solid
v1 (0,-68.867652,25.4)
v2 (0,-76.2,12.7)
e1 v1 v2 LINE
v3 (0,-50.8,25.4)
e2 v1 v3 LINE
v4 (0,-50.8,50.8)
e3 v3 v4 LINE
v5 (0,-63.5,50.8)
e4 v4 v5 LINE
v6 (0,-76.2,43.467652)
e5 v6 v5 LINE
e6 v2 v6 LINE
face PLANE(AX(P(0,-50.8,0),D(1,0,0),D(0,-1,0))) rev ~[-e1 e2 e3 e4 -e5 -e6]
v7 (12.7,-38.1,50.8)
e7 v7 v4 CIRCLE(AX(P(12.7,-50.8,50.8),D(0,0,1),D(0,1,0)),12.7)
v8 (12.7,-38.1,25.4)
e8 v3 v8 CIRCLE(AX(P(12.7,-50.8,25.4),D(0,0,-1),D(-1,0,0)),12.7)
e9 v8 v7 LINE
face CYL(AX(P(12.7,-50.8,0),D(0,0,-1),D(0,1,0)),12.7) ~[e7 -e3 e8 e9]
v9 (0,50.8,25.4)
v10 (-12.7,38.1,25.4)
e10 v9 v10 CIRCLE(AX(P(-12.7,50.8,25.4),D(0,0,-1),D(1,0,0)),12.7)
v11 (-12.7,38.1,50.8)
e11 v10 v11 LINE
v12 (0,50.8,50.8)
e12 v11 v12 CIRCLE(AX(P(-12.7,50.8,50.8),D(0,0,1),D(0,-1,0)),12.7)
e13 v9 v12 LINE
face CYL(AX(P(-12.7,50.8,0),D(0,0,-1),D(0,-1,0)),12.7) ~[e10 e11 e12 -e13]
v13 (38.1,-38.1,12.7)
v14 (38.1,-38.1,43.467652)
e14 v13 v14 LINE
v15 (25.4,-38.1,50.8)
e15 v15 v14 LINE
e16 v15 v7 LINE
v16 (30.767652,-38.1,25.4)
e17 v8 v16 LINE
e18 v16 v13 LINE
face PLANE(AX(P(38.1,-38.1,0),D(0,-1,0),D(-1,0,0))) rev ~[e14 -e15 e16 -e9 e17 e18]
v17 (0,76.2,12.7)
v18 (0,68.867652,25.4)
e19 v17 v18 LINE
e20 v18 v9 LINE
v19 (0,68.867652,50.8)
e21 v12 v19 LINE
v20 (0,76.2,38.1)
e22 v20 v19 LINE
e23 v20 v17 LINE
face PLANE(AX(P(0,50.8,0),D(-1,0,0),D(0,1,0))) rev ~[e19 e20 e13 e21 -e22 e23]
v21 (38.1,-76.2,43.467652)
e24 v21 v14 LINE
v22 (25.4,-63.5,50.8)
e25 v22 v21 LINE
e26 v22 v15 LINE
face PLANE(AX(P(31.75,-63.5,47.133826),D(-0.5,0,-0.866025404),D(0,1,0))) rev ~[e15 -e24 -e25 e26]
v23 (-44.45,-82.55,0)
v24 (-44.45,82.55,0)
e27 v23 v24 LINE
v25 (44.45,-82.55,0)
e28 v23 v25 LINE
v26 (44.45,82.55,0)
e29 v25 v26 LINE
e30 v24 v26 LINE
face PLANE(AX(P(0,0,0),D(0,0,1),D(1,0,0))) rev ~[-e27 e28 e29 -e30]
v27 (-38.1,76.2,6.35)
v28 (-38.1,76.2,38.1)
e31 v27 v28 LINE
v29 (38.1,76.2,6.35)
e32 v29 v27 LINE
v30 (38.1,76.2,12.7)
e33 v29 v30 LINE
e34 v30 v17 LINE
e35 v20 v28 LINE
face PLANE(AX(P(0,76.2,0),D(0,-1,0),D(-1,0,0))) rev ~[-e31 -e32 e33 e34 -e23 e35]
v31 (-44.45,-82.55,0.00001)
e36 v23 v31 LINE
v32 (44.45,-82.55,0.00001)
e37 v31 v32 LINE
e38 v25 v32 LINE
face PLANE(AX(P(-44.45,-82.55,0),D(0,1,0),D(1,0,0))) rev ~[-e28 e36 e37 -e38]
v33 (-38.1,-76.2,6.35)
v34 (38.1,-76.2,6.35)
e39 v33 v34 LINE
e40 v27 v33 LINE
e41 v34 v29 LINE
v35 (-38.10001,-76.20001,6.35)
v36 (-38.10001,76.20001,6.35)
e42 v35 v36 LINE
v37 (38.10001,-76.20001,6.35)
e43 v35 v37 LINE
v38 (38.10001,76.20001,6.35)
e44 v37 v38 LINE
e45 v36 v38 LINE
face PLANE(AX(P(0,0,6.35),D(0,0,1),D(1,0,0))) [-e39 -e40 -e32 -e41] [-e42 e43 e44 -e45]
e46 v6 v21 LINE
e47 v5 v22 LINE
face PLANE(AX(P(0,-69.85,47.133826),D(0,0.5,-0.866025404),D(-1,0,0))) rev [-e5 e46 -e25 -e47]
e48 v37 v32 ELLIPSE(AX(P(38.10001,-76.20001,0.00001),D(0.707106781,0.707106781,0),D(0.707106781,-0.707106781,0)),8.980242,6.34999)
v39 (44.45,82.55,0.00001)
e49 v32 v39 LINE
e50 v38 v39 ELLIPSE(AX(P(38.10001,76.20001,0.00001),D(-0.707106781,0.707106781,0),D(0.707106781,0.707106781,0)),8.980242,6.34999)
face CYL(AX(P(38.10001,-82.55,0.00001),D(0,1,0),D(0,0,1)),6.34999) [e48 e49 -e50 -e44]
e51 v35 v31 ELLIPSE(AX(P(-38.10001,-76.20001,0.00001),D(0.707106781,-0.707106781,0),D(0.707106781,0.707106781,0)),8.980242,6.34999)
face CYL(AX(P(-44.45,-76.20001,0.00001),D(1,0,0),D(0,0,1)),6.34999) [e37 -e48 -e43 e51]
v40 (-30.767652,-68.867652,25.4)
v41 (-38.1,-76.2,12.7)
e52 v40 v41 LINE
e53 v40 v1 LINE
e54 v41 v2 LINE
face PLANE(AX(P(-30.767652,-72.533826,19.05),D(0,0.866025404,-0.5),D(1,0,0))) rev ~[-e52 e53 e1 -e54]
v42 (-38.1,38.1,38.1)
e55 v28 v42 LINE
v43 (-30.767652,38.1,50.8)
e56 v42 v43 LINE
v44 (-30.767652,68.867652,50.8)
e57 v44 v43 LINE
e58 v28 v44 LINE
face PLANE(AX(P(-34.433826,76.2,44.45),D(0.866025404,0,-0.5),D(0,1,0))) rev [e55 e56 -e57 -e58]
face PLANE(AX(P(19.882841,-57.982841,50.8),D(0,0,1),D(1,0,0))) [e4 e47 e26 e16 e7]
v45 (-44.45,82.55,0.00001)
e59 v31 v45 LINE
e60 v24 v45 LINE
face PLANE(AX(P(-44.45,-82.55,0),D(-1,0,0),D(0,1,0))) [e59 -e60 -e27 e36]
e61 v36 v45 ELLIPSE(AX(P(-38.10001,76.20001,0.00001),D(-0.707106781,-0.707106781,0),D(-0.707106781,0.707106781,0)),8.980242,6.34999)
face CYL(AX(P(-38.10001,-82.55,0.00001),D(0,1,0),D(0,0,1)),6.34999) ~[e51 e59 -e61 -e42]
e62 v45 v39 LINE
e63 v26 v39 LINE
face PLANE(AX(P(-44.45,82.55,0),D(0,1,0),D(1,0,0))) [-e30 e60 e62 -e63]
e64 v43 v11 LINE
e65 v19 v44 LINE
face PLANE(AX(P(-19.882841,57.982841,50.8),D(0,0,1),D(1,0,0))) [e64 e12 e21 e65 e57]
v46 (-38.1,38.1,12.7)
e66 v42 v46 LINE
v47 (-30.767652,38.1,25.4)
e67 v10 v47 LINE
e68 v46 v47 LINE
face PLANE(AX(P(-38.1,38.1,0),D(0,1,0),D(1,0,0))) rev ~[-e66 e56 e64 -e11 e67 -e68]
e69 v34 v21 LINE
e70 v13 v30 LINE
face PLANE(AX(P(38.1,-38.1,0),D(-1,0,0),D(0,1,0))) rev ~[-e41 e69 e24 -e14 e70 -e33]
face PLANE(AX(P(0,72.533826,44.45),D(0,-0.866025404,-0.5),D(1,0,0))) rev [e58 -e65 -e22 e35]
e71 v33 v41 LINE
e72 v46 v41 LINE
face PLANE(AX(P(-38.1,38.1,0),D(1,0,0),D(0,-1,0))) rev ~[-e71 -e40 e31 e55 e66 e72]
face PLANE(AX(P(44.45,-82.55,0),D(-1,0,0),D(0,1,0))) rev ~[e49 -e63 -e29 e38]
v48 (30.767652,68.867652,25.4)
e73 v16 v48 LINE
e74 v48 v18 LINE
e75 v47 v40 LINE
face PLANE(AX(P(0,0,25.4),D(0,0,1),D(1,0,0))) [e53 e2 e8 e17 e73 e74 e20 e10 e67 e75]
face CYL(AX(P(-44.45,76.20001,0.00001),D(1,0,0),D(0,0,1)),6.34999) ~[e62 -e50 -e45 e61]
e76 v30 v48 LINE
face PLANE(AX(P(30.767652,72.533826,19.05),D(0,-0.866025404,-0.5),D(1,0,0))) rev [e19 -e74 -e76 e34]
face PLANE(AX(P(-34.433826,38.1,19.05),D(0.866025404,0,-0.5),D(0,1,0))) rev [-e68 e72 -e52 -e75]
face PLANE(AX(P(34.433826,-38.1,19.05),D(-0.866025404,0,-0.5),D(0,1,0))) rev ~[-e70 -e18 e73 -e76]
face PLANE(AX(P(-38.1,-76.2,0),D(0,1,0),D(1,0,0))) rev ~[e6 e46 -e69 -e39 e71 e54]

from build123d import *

# Parameters (mm, degrees)
F0_W        = 88.9
F0_H        = 165.1
F1_DEPTH    = 6.35
F2_DEPTH    = 25.4
F3_DEPTH    = 50.8
F4_C1_SIZE2 = 7.3323484187
F4_C1_SIZE  = 12.7
F4_C2_SIZE2 = 7.3323484187
F4_C2_SIZE  = 12.7
F4_C3_SIZE2 = 12.7
F4_C3_SIZE  = 7.3323484187
F4_C4_SIZE2 = 7.3323484187
F4_C4_SIZE  = 12.7
F4_C5_SIZE2 = 12.7
F4_C5_SIZE  = 7.3323484187
F4_C6_SIZE2 = 12.7
F4_C6_SIZE  = 7.3323484187
F4_C7_SIZE2 = 7.3323484187
F4_C7_SIZE  = 12.7
F4_C8_SIZE2 = 7.3323484187
F4_C8_SIZE  = 12.7
F5_R        = 6.34999


# Not quite as in the source:
# - a fillet or chamfer is up to 0.001 mm smaller than in the source, because OpenCascade refuses the exact size


with BuildPart() as f1:
    # F0 (on Top) → F1 (new body)
    with BuildSketch(Plane.XY):
        Rectangle(F0_W, F0_H)
        Polygon((0, 76.2), (38.1, 76.2), (38.1, -38.1), (38.1, -76.2), (0, -76.2), (-38.1, -76.2), (-38.1, 38.1), (-38.1, 76.2), align=None, mode=Mode.SUBTRACT)
    extrude(amount=F1_DEPTH)

    # F0 (on Top) → F2 (join)
    with BuildSketch(Plane.XY):
        with BuildLine():
            Line((38.1, -38.1), (38.1, 76.2))
            Line((38.1, 76.2), (0, 76.2))
            Line((0, 76.2), (0, 50.8))
            ThreePointArc((0, 50.8), (-3.7197438789, 41.8197438789), (-12.7, 38.1))
            Line((-12.7, 38.1), (-38.1, 38.1))
            Line((-38.1, 38.1), (-38.1, -76.2))
            Line((-38.1, -76.2), (0, -76.2))
            Line((0, -76.2), (0, -50.8))
            ThreePointArc((0, -50.8), (3.7197438789, -41.8197438789), (12.7, -38.1))
            Line((12.7, -38.1), (38.1, -38.1))
        make_face()
    extrude(amount=F2_DEPTH)

    # F0 (on Top) → F3 (join)
    with BuildSketch(Plane.XY):
        with BuildLine():
            Line((0, 50.8), (0, 76.2))
            Line((0, 76.2), (-38.1, 76.2))
            Line((-38.1, 76.2), (-38.1, 38.1))
            Line((-38.1, 38.1), (-12.7, 38.1))
            ThreePointArc((-12.7, 38.1), (-3.7197438789, 41.8197438789), (0, 50.8))
        make_face()
        with BuildLine():
            Line((38.1, -76.2), (38.1, -38.1))
            Line((38.1, -38.1), (12.7, -38.1))
            ThreePointArc((12.7, -38.1), (3.7197438789, -41.8197438789), (0, -50.8))
            Line((0, -50.8), (0, -76.2))
            Line((0, -76.2), (38.1, -76.2))
        make_face()
    extrude(amount=F3_DEPTH)

    # F4: chamfer of 12.7 x 7.3323484187 on 8 edges, made by hand

    # F4_c1
    f4_c1_edges = [f1.edges().sort_by_distance(p)[0] for p in [
        (-38.1, 57.15, 50.8),
    ]]
    f4_c1_side = f1.faces().sort_by_distance((-38.1, 57.15, 50.6533530316))[0]
    chamfer(f4_c1_edges, length=F4_C1_SIZE, length2=F4_C1_SIZE2, reference=f4_c1_side)

    # F4_c2
    f4_c2_edges = [f1.edges().sort_by_distance(p)[0] for p in [
        (-38.1, -19.05, 25.4),
    ]]
    f4_c2_side = f1.faces().sort_by_distance((-38.1, -19.05, 25.2533530316))[0]
    chamfer(f4_c2_edges, length=F4_C2_SIZE, length2=F4_C2_SIZE2, reference=f4_c2_side)

    # F4_c3
    f4_c3_edges = [f1.edges().sort_by_distance(p)[0] for p in [
        (38.1, 19.05, 25.4),
    ]]
    f4_c3_side = f1.faces().sort_by_distance((37.9533530316, 19.05, 25.4))[0]
    chamfer(f4_c3_edges, length=F4_C3_SIZE, length2=F4_C3_SIZE2, reference=f4_c3_side)

    # F4_c4
    f4_c4_edges = [f1.edges().sort_by_distance(p)[0] for p in [
        (15.3838257906, 76.2, 25.4),
    ]]
    f4_c4_side = f1.faces().sort_by_distance((15.3838257906, 76.2, 25.2533530316))[0]
    chamfer(f4_c4_edges, length=F4_C4_SIZE, length2=F4_C4_SIZE2, reference=f4_c4_side)

    # F4_c5
    f4_c5_edges = [f1.edges().sort_by_distance(p)[0] for p in [
        (-15.3838257906, -76.2, 25.4),
    ]]
    f4_c5_side = f1.faces().sort_by_distance((-15.3838257906, -76.0533530316, 25.4))[0]
    chamfer(f4_c5_edges, length=F4_C5_SIZE, length2=F4_C5_SIZE2, reference=f4_c5_side)

    # F4_c6
    f4_c6_edges = [f1.edges().sort_by_distance(p)[0] for p in [
        (19.05, -76.2, 50.8),
    ]]
    f4_c6_side = f1.faces().sort_by_distance((19.05, -76.2, 50.6533530316))[0]
    chamfer(f4_c6_edges, length=F4_C6_SIZE, length2=F4_C6_SIZE2, reference=f4_c6_side)

    # F4_c7
    f4_c7_edges = [f1.edges().sort_by_distance(p)[0] for p in [
        (38.1, -50.8, 50.8),
    ]]
    f4_c7_side = f1.faces().sort_by_distance((37.9533530316, -50.8, 50.8))[0]
    chamfer(f4_c7_edges, length=F4_C7_SIZE, length2=F4_C7_SIZE2, reference=f4_c7_side)

    # F4_c8
    f4_c8_edges = [f1.edges().sort_by_distance(p)[0] for p in [
        (-15.3838257906, 76.2, 50.8),
    ]]
    f4_c8_side = f1.faces().sort_by_distance((-15.3838257906, 76.2, 50.6533530316))[0]
    chamfer(f4_c8_edges, length=F4_C8_SIZE, length2=F4_C8_SIZE2, reference=f4_c8_side)

    # F5 (radius 6.35 in the source; OpenCascade refuses exactly that, so slightly less here)
    f5_edges = [f1.edges().sort_by_distance(p)[0] for p in [
        (0, -82.55, 6.35),
        (-44.45, 0, 6.35),
        (44.45, 0, 6.35),
        (0, 82.55, 6.35),
    ]]
    fillet(f5_edges, radius=F5_R)


solid = f1.part
